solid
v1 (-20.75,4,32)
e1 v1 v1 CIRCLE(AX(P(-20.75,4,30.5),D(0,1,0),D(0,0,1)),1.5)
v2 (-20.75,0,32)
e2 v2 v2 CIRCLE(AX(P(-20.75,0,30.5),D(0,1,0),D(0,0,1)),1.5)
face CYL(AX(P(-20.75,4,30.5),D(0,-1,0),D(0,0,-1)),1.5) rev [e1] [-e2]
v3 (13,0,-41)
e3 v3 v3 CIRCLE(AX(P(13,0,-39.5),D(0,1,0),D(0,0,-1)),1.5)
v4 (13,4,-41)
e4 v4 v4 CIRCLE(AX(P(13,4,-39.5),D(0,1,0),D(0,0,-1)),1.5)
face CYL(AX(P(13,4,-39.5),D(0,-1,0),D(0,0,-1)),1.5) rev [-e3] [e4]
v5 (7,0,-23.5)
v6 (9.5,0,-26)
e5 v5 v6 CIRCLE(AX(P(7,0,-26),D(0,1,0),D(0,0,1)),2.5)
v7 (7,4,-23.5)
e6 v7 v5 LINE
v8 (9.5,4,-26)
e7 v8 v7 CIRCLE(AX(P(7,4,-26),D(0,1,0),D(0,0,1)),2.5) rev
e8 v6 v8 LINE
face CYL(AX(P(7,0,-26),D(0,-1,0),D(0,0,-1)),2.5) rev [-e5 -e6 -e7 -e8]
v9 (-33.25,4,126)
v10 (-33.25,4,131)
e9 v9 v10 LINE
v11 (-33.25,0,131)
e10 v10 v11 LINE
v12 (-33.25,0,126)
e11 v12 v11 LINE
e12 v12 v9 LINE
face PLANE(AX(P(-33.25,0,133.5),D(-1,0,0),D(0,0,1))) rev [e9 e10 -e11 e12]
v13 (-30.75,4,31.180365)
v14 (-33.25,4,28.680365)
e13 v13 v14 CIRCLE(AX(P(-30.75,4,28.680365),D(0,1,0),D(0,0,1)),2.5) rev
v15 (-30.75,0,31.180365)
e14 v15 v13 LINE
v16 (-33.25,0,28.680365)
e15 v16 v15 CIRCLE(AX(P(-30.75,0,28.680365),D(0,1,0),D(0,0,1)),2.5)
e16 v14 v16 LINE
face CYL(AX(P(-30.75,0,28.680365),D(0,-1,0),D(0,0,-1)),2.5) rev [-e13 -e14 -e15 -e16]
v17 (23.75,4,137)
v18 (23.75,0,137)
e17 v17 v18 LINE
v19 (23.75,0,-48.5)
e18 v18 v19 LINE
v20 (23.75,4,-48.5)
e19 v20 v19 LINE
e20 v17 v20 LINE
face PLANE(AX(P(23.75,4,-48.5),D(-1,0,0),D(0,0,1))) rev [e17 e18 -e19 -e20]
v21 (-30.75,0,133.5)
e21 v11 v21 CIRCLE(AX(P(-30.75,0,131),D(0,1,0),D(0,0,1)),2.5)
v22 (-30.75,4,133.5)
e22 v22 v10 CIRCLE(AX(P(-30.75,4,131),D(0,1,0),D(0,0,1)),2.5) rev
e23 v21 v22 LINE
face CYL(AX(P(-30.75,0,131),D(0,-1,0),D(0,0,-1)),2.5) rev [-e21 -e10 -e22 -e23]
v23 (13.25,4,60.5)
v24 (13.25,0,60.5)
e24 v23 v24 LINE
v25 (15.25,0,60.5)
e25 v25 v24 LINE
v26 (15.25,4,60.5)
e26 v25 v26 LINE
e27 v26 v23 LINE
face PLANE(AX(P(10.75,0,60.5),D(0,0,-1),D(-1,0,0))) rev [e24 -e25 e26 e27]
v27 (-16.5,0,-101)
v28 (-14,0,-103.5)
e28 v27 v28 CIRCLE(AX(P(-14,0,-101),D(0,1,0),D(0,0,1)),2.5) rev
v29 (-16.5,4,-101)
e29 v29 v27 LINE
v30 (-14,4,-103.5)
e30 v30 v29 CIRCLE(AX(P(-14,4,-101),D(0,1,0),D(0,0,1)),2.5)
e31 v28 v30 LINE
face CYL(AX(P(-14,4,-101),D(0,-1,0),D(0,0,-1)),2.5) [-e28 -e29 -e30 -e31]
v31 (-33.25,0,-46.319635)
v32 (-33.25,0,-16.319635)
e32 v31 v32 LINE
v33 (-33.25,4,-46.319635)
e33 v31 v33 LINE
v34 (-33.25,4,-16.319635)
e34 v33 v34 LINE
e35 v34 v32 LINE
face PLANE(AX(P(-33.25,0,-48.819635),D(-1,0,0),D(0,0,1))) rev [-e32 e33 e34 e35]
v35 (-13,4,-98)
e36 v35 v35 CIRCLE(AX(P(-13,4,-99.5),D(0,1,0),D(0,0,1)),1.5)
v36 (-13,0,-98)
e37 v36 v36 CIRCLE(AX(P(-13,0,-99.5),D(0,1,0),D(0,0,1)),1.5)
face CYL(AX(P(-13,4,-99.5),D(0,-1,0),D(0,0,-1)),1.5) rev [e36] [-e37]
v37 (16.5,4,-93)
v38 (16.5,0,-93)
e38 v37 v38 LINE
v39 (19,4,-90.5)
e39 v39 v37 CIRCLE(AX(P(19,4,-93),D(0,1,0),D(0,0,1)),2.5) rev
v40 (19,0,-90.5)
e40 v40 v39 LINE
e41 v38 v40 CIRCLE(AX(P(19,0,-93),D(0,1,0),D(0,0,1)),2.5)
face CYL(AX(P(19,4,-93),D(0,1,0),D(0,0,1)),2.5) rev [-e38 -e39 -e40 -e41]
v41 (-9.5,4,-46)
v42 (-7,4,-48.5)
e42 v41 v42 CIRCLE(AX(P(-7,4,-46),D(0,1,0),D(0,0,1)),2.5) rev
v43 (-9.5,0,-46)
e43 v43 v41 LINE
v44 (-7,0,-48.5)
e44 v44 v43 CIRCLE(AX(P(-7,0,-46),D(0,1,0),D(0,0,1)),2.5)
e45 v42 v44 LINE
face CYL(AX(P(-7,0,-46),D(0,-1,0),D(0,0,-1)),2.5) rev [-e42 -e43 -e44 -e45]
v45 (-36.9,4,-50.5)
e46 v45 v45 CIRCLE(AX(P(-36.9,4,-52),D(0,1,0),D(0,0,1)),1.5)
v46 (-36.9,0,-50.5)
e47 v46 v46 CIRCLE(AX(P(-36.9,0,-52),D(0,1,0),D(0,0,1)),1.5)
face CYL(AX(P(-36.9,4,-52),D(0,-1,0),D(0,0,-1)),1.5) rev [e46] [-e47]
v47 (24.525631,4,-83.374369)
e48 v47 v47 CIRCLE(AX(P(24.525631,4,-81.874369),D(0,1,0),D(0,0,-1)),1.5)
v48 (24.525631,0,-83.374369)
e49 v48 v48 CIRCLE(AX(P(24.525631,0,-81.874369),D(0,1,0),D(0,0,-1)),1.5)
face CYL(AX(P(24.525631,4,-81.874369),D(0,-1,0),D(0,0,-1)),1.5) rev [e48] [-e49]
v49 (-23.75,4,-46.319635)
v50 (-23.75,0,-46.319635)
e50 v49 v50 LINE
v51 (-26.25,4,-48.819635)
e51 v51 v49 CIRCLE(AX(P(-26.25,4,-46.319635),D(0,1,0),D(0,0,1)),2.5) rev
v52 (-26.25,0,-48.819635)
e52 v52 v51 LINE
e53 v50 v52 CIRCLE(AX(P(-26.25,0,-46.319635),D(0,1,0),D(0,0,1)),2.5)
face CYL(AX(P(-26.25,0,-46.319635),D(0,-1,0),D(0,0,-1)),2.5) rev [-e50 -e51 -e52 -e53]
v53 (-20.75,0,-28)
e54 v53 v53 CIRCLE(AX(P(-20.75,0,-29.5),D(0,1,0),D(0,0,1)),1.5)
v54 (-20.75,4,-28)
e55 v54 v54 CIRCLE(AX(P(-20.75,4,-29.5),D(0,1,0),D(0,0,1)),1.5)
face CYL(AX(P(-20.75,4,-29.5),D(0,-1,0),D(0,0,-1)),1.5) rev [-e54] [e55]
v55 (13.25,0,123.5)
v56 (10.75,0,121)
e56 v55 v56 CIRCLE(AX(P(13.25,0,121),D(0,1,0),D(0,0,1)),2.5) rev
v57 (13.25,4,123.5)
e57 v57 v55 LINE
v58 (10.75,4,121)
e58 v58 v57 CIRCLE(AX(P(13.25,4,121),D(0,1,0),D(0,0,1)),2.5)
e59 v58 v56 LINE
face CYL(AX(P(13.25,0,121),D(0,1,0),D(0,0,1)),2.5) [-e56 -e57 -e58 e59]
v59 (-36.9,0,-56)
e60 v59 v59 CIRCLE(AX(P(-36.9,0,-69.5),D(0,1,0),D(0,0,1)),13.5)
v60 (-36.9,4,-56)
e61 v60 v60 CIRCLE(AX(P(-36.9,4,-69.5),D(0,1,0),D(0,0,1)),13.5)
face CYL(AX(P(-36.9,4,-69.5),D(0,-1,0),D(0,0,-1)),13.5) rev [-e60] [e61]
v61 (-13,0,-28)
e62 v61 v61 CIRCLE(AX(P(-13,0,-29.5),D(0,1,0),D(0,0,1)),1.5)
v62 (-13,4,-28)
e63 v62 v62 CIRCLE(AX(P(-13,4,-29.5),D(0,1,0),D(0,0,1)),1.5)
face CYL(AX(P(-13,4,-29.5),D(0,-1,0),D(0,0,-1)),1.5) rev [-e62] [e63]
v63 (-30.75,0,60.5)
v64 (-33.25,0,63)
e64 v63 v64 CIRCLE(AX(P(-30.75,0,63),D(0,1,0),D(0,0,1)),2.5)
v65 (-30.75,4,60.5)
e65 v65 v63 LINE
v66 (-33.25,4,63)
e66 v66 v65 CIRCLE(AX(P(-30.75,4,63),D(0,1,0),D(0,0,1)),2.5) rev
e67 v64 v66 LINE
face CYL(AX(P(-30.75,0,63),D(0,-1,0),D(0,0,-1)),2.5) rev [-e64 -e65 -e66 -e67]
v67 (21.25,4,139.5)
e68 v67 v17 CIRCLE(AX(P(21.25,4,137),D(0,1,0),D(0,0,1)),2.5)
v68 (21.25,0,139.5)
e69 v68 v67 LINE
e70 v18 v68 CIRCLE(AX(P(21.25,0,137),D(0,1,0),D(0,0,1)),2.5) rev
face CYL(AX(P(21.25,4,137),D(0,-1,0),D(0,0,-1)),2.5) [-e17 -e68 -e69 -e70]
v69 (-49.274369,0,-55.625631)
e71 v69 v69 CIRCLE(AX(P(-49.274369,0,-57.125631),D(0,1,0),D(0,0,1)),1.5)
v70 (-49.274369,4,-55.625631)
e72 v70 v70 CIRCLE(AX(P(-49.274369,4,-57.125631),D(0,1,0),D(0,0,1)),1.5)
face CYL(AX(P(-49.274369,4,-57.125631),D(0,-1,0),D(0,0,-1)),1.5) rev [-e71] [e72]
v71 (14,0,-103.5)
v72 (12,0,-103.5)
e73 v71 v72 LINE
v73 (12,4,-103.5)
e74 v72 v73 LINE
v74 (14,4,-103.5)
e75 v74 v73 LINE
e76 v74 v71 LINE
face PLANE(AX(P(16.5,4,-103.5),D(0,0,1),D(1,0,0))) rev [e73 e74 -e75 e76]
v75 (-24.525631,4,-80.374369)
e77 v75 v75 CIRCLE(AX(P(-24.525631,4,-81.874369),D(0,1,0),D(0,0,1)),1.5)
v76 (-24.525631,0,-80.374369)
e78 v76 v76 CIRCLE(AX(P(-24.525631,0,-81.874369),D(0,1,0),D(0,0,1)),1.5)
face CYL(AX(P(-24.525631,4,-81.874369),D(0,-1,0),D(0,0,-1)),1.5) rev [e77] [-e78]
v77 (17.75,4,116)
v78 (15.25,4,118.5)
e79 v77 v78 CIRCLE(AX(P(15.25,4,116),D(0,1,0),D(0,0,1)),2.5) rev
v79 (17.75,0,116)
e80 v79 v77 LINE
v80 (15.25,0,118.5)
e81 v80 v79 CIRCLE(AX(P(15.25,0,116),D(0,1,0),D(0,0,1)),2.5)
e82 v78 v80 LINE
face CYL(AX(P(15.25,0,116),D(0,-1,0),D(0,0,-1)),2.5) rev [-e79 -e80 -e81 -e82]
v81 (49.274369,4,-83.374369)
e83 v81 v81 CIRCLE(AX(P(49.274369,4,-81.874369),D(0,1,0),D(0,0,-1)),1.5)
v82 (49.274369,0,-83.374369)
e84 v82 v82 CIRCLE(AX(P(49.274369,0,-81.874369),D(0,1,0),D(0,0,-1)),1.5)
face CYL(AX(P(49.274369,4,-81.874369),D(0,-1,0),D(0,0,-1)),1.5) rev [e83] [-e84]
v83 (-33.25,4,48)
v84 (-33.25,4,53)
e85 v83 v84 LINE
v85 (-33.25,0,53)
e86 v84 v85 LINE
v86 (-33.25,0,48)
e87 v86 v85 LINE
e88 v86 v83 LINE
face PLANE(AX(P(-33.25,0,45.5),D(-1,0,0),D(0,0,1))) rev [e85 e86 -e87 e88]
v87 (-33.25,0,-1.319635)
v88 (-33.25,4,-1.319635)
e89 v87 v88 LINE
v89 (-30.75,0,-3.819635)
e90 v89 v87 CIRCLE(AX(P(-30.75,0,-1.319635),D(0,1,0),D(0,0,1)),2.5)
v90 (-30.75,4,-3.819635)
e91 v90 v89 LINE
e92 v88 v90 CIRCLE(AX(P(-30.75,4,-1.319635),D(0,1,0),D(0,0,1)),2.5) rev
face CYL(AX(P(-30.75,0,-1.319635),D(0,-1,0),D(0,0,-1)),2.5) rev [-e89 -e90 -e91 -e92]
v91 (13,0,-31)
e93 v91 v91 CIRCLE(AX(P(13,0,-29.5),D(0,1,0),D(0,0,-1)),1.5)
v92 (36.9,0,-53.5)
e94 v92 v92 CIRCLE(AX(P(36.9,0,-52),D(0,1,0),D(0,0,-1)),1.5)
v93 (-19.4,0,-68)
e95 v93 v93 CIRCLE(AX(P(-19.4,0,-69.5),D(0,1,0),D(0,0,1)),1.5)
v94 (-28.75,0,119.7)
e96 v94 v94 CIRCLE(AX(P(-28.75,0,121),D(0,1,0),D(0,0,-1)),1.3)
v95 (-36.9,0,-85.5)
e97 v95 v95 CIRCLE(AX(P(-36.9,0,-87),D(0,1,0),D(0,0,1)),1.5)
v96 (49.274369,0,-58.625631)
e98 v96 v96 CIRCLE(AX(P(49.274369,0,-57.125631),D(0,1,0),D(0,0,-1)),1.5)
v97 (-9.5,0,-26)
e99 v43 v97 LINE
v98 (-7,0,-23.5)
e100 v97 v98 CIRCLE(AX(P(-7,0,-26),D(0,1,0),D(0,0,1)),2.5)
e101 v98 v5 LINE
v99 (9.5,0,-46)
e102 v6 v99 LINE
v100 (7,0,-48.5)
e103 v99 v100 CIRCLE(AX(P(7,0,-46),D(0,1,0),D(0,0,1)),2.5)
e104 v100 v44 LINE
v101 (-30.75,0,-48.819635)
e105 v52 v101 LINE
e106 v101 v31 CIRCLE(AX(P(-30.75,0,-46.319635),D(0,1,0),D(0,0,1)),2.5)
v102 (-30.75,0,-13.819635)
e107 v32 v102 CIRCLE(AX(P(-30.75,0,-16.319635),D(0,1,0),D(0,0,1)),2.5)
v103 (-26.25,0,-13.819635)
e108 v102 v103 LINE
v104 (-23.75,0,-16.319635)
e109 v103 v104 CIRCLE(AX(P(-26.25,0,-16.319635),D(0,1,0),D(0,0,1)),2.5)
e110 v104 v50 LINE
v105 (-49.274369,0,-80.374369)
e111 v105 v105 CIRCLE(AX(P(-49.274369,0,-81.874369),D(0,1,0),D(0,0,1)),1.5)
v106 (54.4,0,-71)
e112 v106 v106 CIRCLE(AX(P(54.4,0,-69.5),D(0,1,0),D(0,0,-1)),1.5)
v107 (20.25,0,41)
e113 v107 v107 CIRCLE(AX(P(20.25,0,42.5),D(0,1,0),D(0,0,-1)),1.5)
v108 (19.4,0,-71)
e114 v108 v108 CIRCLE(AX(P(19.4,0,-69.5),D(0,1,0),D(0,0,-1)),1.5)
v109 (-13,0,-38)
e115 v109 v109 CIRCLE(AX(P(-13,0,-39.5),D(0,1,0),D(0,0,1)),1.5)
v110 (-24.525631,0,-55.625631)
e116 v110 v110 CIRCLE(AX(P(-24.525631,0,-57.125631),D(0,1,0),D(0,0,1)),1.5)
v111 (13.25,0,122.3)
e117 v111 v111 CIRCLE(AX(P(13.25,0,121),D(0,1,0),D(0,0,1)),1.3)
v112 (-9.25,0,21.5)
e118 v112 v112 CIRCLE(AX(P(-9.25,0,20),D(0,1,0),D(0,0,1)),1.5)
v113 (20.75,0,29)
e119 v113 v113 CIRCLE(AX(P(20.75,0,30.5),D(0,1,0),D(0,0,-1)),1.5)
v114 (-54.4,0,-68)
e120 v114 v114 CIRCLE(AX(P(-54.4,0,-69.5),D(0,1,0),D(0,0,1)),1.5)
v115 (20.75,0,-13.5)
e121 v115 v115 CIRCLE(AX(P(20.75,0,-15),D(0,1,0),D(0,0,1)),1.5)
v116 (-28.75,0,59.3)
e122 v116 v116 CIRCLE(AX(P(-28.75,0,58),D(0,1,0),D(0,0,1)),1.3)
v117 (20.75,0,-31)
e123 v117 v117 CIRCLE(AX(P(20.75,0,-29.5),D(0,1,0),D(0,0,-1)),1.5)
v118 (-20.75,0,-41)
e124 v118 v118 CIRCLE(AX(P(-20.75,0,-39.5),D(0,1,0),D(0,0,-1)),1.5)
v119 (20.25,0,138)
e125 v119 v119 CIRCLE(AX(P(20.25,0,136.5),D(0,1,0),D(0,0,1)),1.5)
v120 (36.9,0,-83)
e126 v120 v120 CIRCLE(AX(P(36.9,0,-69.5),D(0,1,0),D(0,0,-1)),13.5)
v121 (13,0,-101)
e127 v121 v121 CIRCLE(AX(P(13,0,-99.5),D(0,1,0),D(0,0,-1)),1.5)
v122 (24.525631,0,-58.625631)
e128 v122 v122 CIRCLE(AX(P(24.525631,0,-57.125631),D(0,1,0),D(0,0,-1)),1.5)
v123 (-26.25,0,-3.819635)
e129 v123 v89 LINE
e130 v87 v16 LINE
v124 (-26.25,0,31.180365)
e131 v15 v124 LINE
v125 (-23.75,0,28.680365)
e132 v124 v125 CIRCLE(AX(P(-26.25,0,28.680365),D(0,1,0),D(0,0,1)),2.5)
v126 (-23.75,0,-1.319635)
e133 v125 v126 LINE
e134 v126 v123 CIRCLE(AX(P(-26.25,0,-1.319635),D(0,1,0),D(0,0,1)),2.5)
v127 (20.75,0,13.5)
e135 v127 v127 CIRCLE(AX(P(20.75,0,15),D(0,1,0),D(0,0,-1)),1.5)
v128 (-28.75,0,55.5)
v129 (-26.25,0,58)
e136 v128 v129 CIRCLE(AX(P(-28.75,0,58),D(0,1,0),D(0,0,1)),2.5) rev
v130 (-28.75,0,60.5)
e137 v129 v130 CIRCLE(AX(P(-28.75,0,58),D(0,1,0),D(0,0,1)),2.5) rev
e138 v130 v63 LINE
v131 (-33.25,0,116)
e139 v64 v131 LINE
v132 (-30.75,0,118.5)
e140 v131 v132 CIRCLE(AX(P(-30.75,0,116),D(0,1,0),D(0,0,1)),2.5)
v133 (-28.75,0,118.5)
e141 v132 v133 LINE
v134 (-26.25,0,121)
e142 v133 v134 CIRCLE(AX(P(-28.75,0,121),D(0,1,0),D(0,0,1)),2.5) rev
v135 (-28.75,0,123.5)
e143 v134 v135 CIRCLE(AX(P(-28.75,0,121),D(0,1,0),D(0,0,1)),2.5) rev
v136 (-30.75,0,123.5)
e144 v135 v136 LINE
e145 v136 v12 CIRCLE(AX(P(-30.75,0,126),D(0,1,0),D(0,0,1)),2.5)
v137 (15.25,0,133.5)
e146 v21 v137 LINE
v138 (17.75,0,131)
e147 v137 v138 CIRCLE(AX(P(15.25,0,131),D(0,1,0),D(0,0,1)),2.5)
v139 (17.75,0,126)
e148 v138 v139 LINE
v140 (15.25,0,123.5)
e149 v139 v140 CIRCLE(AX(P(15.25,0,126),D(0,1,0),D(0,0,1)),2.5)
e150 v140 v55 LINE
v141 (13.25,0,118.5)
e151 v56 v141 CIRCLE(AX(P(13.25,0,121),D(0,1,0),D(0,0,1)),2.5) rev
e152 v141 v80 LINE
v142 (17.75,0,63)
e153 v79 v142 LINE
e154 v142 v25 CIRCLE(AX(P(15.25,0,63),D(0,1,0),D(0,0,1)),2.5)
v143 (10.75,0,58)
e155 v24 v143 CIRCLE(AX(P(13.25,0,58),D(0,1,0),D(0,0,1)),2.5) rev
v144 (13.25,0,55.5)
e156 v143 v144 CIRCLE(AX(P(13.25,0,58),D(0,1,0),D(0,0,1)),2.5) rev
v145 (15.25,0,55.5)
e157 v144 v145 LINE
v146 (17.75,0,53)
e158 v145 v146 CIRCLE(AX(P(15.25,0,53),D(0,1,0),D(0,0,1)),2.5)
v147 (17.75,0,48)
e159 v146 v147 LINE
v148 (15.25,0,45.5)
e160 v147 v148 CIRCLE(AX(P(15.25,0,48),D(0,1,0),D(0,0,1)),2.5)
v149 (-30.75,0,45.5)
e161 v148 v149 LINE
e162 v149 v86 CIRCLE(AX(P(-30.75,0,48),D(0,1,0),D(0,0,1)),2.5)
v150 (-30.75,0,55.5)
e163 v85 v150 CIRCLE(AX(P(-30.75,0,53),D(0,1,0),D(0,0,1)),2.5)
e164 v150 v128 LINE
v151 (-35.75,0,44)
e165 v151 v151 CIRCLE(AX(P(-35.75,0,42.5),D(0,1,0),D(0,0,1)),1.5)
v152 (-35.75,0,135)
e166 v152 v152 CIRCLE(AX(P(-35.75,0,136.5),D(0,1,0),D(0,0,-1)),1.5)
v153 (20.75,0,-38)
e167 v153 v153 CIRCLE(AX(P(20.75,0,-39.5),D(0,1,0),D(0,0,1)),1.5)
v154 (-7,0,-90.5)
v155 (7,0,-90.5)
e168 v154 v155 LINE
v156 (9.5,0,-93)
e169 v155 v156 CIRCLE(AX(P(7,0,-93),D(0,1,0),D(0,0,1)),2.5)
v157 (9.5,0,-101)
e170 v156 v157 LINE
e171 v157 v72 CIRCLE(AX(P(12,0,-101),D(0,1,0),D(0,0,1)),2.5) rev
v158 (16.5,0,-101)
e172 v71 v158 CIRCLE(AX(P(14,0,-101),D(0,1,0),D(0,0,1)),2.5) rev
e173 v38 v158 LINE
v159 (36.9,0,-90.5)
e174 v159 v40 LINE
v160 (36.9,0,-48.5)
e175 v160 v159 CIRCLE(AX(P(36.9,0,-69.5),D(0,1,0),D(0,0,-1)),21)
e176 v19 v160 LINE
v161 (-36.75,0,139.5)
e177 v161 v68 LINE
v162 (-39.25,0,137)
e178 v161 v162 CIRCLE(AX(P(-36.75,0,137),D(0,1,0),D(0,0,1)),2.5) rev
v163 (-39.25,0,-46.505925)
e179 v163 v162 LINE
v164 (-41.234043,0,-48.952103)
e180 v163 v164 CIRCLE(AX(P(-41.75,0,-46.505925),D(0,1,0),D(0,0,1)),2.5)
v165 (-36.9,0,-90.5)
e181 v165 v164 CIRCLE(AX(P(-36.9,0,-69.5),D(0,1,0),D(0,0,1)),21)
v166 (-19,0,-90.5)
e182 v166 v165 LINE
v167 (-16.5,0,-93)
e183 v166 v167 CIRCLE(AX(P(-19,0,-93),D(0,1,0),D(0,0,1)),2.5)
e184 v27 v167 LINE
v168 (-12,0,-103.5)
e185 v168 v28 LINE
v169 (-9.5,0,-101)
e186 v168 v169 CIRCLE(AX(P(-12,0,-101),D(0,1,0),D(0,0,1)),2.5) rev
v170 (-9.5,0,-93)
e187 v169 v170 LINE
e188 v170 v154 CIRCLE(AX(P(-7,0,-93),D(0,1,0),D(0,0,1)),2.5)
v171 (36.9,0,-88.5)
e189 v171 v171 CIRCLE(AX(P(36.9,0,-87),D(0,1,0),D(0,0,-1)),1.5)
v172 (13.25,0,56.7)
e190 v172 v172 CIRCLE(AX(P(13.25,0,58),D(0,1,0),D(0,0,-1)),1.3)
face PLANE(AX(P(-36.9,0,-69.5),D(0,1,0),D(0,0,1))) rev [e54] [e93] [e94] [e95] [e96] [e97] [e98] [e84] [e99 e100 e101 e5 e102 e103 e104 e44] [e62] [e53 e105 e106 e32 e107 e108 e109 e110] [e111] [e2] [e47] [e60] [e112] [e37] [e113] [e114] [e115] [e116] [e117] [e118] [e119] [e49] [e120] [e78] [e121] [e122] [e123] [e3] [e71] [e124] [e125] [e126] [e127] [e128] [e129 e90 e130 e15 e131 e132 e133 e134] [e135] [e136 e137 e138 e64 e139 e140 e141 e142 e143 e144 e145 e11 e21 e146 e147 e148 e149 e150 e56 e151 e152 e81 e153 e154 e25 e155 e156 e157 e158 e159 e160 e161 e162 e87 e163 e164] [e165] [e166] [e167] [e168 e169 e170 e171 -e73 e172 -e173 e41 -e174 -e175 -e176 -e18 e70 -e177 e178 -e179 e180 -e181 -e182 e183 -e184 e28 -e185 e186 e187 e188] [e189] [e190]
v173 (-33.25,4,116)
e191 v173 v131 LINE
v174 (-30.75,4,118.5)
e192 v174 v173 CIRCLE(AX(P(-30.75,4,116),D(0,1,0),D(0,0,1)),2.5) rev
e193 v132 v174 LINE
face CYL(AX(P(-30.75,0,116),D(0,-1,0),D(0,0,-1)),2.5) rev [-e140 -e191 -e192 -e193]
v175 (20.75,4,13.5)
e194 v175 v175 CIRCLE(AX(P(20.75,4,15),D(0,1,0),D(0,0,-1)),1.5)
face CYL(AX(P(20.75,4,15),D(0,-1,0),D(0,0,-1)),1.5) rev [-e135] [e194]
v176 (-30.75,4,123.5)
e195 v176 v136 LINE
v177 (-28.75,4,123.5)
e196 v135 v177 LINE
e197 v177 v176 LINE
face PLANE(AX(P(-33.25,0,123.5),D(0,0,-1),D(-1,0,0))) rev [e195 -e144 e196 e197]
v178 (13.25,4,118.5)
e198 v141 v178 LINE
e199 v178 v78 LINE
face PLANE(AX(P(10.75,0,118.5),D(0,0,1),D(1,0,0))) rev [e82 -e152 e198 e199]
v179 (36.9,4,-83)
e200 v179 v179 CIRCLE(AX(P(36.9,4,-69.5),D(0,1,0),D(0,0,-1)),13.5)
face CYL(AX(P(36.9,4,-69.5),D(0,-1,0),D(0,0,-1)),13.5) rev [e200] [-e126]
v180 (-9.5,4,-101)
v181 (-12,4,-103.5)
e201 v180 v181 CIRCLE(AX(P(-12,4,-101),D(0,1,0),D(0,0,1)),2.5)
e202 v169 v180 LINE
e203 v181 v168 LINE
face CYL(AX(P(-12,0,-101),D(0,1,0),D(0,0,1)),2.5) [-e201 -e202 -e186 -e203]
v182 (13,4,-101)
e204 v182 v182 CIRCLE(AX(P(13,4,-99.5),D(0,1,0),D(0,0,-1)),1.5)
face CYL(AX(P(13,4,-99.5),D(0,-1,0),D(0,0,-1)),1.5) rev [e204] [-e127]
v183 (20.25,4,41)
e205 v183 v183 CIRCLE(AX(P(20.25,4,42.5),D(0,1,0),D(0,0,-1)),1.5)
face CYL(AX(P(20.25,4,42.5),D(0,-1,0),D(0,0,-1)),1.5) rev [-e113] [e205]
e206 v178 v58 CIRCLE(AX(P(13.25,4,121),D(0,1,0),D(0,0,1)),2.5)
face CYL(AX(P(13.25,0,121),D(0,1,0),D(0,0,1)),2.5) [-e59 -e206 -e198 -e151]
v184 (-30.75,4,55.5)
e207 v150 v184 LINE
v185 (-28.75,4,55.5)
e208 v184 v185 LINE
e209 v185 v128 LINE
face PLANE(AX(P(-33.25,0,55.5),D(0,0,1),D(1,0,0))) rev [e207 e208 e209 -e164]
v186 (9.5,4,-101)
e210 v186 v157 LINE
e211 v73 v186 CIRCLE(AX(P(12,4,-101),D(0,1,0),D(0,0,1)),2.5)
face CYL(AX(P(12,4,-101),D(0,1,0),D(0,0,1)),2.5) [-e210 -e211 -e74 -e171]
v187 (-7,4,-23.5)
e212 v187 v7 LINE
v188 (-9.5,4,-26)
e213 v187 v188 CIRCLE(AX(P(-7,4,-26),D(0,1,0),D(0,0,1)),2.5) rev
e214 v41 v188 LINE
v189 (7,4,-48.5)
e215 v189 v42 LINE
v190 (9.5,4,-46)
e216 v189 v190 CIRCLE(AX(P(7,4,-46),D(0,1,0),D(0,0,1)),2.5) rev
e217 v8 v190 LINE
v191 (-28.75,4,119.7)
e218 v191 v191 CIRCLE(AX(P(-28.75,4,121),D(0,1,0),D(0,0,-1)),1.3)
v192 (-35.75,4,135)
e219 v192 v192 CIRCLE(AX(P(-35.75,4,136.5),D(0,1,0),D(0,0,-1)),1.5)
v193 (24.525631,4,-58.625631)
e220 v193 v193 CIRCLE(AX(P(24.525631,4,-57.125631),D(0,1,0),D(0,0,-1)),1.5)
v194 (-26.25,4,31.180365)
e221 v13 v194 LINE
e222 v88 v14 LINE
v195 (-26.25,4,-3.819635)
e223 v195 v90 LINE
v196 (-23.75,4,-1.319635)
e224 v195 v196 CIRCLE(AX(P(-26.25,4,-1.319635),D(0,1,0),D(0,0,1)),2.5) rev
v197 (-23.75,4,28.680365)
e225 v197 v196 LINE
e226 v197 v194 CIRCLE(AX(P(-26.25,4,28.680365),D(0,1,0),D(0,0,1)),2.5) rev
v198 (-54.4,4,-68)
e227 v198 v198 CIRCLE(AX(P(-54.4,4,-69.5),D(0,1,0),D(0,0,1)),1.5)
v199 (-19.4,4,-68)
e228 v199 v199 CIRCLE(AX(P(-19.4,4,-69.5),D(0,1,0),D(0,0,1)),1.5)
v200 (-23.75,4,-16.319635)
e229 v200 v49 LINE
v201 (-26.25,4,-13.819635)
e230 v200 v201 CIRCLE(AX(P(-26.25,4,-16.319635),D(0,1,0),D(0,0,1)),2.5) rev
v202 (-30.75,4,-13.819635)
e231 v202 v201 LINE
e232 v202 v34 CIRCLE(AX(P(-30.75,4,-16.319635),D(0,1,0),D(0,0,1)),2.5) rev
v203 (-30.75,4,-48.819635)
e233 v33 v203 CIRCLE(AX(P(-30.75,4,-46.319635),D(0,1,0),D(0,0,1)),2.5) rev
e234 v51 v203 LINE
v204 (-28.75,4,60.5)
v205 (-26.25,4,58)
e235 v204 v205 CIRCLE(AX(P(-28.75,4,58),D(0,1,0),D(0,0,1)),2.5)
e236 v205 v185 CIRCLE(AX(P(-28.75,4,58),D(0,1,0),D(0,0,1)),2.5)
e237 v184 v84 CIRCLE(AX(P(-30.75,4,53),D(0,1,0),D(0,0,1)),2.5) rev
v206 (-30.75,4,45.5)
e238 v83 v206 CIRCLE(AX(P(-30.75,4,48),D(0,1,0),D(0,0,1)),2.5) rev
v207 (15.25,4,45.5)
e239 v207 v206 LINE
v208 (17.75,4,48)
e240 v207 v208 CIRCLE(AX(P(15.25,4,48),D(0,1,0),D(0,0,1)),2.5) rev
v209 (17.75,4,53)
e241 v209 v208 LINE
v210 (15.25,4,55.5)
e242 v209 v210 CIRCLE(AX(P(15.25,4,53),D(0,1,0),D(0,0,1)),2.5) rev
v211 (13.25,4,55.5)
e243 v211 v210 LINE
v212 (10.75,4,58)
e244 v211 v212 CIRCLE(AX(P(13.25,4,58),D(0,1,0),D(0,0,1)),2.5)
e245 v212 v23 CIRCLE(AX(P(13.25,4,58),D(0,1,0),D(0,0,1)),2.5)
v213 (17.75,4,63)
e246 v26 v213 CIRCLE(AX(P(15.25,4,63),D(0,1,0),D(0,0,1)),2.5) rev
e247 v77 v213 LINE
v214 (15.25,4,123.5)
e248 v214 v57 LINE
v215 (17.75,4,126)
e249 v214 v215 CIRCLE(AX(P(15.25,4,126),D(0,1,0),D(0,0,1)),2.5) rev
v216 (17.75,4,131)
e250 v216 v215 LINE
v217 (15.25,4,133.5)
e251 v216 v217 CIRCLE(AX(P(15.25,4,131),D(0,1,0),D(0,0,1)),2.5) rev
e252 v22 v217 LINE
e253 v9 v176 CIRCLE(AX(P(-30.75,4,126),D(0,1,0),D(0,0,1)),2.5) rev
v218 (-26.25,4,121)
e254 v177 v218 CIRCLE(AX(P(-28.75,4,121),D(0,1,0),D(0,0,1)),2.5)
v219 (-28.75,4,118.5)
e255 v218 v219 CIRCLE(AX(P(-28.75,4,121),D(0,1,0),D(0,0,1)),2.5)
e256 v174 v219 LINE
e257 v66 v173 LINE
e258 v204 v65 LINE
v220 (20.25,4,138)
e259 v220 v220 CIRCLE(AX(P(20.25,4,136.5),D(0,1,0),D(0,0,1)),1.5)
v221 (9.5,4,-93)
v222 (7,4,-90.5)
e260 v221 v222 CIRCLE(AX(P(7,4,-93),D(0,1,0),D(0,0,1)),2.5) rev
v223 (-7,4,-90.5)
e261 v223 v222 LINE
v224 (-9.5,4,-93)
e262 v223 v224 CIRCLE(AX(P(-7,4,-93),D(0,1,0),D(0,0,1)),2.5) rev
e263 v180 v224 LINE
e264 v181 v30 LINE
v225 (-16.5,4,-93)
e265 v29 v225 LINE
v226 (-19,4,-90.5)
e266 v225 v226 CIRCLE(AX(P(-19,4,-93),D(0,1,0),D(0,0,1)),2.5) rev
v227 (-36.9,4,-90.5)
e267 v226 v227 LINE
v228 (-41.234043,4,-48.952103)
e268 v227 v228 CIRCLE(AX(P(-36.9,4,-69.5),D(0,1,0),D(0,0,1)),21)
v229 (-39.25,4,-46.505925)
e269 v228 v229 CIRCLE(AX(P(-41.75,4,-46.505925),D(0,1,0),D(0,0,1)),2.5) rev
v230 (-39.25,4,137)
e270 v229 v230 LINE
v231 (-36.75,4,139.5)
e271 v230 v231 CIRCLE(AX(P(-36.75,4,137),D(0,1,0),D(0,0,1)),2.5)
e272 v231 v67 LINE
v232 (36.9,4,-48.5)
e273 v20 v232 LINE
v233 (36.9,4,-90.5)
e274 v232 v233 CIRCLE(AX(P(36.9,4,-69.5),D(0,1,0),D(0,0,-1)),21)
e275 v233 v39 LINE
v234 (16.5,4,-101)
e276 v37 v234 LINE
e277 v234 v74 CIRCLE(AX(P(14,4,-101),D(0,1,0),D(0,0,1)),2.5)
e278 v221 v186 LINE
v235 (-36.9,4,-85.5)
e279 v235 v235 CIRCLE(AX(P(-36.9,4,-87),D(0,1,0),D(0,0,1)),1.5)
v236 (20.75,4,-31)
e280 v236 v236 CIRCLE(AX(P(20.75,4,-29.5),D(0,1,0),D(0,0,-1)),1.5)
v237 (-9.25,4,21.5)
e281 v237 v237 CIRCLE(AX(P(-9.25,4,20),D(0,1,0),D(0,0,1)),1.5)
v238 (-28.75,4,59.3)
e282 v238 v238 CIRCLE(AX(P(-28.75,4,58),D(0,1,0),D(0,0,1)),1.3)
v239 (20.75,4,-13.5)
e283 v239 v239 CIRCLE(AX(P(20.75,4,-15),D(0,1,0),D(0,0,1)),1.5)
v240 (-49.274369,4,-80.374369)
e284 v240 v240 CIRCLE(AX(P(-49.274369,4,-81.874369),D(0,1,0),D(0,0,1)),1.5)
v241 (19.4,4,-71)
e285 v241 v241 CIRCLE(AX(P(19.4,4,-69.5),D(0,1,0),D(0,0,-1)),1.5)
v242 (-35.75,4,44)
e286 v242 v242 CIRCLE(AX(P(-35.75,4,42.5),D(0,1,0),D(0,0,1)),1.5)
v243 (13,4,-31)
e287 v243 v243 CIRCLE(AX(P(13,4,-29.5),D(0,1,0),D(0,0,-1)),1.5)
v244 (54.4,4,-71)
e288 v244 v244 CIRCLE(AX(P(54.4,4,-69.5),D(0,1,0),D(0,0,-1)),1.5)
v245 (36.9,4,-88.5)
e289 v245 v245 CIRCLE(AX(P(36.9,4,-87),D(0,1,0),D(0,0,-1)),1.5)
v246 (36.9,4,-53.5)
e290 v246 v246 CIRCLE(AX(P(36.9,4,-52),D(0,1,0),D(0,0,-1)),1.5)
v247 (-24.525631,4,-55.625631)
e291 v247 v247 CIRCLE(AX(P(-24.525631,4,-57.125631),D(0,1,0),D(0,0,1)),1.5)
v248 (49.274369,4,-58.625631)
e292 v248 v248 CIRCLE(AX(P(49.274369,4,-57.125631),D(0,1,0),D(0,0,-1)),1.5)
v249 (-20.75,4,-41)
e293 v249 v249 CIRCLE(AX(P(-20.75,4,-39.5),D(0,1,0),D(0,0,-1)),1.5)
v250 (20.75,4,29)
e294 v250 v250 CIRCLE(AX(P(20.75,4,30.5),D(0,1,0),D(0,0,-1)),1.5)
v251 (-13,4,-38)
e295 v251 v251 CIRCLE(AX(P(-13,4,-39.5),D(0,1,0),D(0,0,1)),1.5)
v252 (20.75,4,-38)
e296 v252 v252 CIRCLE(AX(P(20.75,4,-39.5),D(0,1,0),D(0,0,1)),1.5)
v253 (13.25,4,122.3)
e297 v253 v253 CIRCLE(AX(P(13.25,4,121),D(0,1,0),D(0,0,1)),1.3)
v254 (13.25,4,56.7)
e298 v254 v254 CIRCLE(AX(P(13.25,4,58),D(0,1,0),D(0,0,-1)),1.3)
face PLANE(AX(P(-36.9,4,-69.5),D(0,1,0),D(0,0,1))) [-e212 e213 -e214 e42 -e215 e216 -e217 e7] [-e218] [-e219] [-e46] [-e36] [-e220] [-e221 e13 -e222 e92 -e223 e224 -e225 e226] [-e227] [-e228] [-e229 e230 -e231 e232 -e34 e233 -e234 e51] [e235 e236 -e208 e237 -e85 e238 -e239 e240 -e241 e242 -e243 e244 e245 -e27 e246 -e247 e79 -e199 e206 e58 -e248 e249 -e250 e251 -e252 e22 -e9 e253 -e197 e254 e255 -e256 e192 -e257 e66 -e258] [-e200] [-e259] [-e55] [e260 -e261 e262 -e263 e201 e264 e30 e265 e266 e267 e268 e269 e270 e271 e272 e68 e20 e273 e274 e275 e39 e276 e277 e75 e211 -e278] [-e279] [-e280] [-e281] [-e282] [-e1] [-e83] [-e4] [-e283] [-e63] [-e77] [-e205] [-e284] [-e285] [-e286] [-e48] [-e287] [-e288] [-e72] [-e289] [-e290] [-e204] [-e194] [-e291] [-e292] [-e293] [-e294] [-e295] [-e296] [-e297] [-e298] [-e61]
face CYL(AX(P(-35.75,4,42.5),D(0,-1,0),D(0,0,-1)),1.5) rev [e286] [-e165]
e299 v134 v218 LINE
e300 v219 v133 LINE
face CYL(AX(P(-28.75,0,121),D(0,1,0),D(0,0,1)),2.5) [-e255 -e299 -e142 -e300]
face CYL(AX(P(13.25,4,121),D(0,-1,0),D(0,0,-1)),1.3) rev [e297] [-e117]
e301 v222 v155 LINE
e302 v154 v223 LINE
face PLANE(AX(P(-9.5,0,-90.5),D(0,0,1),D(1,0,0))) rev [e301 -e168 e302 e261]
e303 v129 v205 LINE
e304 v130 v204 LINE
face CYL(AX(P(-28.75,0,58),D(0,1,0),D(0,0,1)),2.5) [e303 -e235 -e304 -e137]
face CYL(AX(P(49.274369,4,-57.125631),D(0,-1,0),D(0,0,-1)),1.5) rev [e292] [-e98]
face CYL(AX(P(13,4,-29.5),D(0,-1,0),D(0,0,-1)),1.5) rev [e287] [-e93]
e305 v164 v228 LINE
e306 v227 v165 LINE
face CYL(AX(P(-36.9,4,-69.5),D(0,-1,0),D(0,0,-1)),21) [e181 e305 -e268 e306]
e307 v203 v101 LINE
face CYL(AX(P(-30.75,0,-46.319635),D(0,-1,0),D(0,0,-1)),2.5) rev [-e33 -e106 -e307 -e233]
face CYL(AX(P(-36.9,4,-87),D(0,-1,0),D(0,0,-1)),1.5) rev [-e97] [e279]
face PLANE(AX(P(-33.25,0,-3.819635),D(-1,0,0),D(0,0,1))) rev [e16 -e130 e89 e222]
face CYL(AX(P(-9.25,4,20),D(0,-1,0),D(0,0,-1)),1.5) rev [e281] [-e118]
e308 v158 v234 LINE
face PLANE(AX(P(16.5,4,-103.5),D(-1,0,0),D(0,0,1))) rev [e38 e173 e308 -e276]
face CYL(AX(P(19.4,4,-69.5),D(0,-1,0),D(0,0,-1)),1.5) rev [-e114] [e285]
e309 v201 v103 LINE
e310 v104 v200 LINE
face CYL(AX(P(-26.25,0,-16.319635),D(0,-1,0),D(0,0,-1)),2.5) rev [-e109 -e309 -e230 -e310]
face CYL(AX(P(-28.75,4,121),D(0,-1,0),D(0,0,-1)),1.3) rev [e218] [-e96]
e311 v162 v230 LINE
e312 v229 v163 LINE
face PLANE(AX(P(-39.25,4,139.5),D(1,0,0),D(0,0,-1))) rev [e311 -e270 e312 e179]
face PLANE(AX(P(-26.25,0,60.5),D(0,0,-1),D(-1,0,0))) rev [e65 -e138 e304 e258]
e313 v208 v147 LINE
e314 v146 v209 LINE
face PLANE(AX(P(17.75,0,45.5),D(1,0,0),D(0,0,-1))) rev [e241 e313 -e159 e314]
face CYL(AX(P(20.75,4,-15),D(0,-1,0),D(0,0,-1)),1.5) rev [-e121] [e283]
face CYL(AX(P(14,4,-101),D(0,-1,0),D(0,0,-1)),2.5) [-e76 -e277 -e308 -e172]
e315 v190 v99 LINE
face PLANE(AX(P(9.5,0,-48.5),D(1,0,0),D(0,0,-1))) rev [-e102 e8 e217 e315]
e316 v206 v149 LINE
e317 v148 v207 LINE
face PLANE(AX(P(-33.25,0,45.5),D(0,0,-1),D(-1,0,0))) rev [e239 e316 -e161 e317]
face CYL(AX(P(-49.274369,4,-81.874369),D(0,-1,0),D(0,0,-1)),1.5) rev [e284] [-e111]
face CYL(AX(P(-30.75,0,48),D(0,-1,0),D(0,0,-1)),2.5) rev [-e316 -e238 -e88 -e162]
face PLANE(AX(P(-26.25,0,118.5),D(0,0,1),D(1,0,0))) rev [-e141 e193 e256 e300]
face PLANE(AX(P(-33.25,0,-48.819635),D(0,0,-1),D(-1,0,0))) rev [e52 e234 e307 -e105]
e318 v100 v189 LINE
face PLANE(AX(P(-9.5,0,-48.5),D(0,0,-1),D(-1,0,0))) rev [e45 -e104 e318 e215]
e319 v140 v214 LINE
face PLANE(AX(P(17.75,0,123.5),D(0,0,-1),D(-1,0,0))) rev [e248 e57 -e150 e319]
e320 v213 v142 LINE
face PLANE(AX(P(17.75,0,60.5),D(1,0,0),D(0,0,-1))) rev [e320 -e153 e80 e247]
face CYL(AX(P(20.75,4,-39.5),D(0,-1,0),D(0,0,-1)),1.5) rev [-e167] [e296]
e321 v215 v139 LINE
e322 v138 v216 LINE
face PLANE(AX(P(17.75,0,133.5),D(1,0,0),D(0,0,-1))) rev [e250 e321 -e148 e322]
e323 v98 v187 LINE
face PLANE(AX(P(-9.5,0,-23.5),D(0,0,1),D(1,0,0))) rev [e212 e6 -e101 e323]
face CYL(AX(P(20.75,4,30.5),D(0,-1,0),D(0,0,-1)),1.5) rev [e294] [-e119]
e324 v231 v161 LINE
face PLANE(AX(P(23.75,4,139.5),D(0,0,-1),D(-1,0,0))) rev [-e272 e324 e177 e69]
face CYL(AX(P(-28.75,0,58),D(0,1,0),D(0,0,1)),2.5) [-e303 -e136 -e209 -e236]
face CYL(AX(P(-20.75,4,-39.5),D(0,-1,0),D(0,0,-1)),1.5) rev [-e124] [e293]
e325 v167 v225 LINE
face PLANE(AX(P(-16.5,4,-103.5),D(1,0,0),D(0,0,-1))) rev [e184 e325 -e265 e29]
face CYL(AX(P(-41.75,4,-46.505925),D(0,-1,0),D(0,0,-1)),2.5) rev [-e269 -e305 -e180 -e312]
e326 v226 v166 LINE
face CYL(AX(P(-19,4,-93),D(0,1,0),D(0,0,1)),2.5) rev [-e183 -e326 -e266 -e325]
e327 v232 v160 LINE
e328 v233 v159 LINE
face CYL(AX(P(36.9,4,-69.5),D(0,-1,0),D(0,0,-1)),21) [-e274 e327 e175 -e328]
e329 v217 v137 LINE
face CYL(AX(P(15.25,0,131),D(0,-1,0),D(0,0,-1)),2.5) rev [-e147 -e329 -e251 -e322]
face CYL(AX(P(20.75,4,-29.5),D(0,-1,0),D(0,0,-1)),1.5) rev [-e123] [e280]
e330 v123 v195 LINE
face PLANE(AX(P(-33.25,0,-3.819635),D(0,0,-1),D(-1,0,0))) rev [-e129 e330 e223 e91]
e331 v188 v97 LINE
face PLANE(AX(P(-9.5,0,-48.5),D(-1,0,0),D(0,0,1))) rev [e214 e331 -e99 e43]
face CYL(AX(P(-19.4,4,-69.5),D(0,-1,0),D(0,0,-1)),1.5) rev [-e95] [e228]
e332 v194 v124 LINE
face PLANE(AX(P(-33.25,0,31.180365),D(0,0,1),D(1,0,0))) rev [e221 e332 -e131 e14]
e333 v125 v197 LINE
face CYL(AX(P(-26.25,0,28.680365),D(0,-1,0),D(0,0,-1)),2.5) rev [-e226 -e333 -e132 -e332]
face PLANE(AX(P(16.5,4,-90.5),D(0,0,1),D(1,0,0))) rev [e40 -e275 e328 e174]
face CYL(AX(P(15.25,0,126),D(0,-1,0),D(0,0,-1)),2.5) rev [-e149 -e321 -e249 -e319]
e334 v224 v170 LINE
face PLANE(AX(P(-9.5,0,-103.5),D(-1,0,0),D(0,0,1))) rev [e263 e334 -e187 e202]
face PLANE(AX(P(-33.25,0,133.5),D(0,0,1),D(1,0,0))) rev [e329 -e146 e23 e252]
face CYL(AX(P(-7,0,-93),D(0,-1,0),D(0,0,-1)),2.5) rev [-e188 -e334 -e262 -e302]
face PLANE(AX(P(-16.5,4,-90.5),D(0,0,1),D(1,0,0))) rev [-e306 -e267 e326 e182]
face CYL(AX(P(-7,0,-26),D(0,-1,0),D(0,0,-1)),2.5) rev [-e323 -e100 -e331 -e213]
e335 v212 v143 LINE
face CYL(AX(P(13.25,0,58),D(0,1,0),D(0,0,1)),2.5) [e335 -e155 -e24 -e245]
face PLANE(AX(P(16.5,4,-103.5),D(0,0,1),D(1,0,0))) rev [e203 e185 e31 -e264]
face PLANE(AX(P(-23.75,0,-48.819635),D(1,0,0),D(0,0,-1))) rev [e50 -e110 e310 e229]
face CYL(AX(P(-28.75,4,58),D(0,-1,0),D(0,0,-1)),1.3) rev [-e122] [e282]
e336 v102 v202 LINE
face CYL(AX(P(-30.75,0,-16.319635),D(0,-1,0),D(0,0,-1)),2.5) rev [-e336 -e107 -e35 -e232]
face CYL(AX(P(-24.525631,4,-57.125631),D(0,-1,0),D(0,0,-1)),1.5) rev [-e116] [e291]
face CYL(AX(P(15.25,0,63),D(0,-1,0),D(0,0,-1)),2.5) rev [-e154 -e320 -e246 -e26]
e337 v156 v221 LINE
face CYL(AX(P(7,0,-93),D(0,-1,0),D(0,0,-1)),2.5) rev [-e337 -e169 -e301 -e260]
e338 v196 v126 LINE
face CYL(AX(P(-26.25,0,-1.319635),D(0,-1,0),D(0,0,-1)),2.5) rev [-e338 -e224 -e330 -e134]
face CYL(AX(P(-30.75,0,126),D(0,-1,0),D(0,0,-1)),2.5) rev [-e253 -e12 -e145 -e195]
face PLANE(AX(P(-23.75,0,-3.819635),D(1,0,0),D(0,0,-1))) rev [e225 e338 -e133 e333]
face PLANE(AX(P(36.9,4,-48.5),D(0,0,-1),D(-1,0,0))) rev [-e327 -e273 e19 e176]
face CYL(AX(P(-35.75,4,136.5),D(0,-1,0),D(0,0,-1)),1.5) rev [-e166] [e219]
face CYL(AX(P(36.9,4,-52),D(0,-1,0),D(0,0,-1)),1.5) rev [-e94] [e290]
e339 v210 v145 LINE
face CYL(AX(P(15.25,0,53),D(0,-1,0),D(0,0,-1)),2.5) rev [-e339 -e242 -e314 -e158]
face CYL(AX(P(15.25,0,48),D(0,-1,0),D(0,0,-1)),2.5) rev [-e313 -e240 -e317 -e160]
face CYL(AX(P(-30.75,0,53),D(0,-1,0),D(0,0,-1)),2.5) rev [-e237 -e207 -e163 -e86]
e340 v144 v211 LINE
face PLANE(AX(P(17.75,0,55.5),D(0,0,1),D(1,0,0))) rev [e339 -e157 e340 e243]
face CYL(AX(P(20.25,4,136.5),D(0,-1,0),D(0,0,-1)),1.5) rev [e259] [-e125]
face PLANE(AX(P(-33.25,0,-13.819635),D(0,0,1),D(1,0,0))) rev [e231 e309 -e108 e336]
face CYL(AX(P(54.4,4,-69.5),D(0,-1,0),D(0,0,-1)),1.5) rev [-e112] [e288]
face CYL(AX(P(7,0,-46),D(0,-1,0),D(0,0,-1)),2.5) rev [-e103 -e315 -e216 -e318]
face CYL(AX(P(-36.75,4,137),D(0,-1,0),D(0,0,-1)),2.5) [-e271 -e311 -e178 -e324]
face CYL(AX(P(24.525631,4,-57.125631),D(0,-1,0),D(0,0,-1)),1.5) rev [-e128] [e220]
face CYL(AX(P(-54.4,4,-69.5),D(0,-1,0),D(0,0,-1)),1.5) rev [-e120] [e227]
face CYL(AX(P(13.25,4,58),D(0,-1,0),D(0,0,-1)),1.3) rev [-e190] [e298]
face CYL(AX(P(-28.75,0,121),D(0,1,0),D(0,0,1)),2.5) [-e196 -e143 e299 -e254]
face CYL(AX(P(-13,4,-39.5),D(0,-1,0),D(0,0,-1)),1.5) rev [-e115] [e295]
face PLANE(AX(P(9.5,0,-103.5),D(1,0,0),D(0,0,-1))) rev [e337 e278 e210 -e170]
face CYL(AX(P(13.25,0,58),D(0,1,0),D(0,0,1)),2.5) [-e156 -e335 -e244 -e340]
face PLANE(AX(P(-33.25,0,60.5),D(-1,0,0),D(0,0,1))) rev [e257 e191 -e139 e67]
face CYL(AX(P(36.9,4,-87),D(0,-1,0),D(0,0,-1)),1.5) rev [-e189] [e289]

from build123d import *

# Parameters (mm, degrees)
SKETCH_1_R          = 13.5
SKETCH_1_R_2        = 1.5
SKETCH_1_R_3        = 1.3
EXTRUDE_1_DEPTH     = 4
SKETCH_2_W          = 19
SKETCH_2_H          = 13
SKETCH_2_W_2        = 9.5
SKETCH_2_H_2        = 35
SKETCH_2_H_3        = 25
CUT_EXTRUDE_1_DEPTH = 152.091561644
FILLET_1_R          = 2.5


with BuildPart() as part:
    # 草图1 → 凸台-拉伸1 (new body)
    with BuildSketch(Plane(origin=(0, 0, 0), x_dir=(1, 0, 0), z_dir=(0, 1, 0))):
        with BuildLine():
            Line((16.5, 103.5), (-16.5, 103.5))
            Line((-16.5, 103.5), (-16.5, 90.5))
            Line((-16.5, 90.5), (-36.9, 90.5))
            ThreePointArc((-36.9, 90.5), (-57.866998484, 70.67684942), (-39.25, 48.631902339))
            Line((-39.25, 48.631902339), (-39.25, -39.5))
            Line((-39.25, -39.5), (-39.25, -139.5))
            Line((-39.25, -139.5), (23.75, -139.5))
            Line((23.75, -139.5), (23.75, -39.5))
            Line((23.75, -39.5), (23.75, -34.5))
            Line((23.75, -34.5), (23.75, 34.5))
            Line((23.75, 34.5), (23.75, 48.5))
            Line((23.75, 48.5), (36.9, 48.5))
            ThreePointArc((36.9, 48.5), (57.9, 69.5), (36.9, 90.5))
            Line((36.9, 90.5), (16.5, 90.5))
            Line((16.5, 90.5), (16.5, 103.5))
        make_face()
        with Locations(Location((-36.9, 69.5, 0), (0, 0, 270))):
            Circle(SKETCH_1_R, mode=Mode.SUBTRACT)
        with Locations(Location((-36.9, 87, 0), (0, 0, 270))):
            Circle(SKETCH_1_R_2, mode=Mode.SUBTRACT)
        with Locations(Location((-24.525631329, 81.874368671, 0), (0, 0, 270))):
            Circle(SKETCH_1_R_2, mode=Mode.SUBTRACT)
        with Locations(Location((-19.4, 69.5, 0), (0, 0, 270))):
            Circle(SKETCH_1_R_2, mode=Mode.SUBTRACT)
        with Locations(Location((-24.525631329, 57.125631329, 0), (0, 0, 270))):
            Circle(SKETCH_1_R_2, mode=Mode.SUBTRACT)
        with Locations(Location((-36.9, 52, 0), (0, 0, 270))):
            Circle(SKETCH_1_R_2, mode=Mode.SUBTRACT)
        with Locations(Location((-49.274368671, 57.125631329, 0), (0, 0, 270))):
            Circle(SKETCH_1_R_2, mode=Mode.SUBTRACT)
        with Locations(Location((-54.4, 69.5, 0), (0, 0, 270))):
            Circle(SKETCH_1_R_2, mode=Mode.SUBTRACT)
        with Locations(Location((-49.274368671, 81.874368671, 0), (0, 0, 270))):
            Circle(SKETCH_1_R_2, mode=Mode.SUBTRACT)
        with Locations(Location((-13, 99.5, 0), (0, 0, 270))):
            Circle(SKETCH_1_R_2, mode=Mode.SUBTRACT)
        with Locations(Location((-13, 39.5, 0), (0, 0, 270))):
            Circle(SKETCH_1_R_2, mode=Mode.SUBTRACT)
        with Locations(Location((13, 39.5, 0), (0, 0, 90))):
            Circle(SKETCH_1_R_2, mode=Mode.SUBTRACT)
        with Locations(Location((13, 99.5, 0), (0, 0, 90))):
            Circle(SKETCH_1_R_2, mode=Mode.SUBTRACT)
        with Locations(Location((54.4, 69.5, 0), (0, 0, 90))):
            Circle(SKETCH_1_R_2, mode=Mode.SUBTRACT)
        with Locations(Location((49.274368671, 57.125631329, 0), (0, 0, 90))):
            Circle(SKETCH_1_R_2, mode=Mode.SUBTRACT)
        with Locations(Location((36.9, 52, 0), (0, 0, 90))):
            Circle(SKETCH_1_R_2, mode=Mode.SUBTRACT)
        with Locations(Location((24.525631329, 57.125631329, 0), (0, 0, 90))):
            Circle(SKETCH_1_R_2, mode=Mode.SUBTRACT)
        with Locations(Location((19.4, 69.5, 0), (0, 0, 90))):
            Circle(SKETCH_1_R_2, mode=Mode.SUBTRACT)
        with Locations(Location((24.525631329, 81.874368671, 0), (0, 0, 90))):
            Circle(SKETCH_1_R_2, mode=Mode.SUBTRACT)
        with Locations(Location((36.9, 87, 0), (0, 0, 90))):
            Circle(SKETCH_1_R_2, mode=Mode.SUBTRACT)
        with Locations(Location((49.274368671, 81.874368671, 0), (0, 0, 90))):
            Circle(SKETCH_1_R_2, mode=Mode.SUBTRACT)
        with Locations(Location((36.9, 69.5, 0), (0, 0, 90))):
            Circle(SKETCH_1_R, mode=Mode.SUBTRACT)
        with Locations(Location((-13, 29.5, 0), (0, 0, 270))):
            Circle(SKETCH_1_R_2, mode=Mode.SUBTRACT)
        with Locations(Location((-35.75, -42.5, 0), (0, 0, 270))):
            Circle(SKETCH_1_R_2, mode=Mode.SUBTRACT)
        with Locations(Location((-35.75, -136.5, 0), (0, 0, 90))):
            Circle(SKETCH_1_R_2, mode=Mode.SUBTRACT)
        with Locations(Location((20.25, -136.5, 0), (0, 0, 270))):
            Circle(SKETCH_1_R_2, mode=Mode.SUBTRACT)
        with Locations(Location((20.25, -42.5, 0), (0, 0, 90))):
            Circle(SKETCH_1_R_2, mode=Mode.SUBTRACT)
        with Locations(Location((13, 29.5, 0), (0, 0, 90))):
            Circle(SKETCH_1_R_2, mode=Mode.SUBTRACT)
        with Locations(Location((20.75, 15, 0), (0, 0, 270))):
            Circle(SKETCH_1_R_2, mode=Mode.SUBTRACT)
        with Locations(Location((20.75, -15, 0), (0, 0, 90))):
            Circle(SKETCH_1_R_2, mode=Mode.SUBTRACT)
        with Locations(Location((-28.75, -58, 0), (0, 0, 270))):
            Circle(SKETCH_1_R_3, mode=Mode.SUBTRACT)
        with Locations(Location((-28.75, -121, 0), (0, 0, 90))):
            Circle(SKETCH_1_R_3, mode=Mode.SUBTRACT)
        with Locations(Location((13.25, -121, 0), (0, 0, 270))):
            Circle(SKETCH_1_R_3, mode=Mode.SUBTRACT)
        with Locations(Location((13.25, -58, 0), (0, 0, 90))):
            Circle(SKETCH_1_R_3, mode=Mode.SUBTRACT)
        with Locations(Location((-9.25, -20, 0), (0, 0, 270))):
            Circle(SKETCH_1_R_2, mode=Mode.SUBTRACT)
        with Locations(Location((20.75, 39.5, 0), (0, 0, 270))):
            Circle(SKETCH_1_R_2, mode=Mode.SUBTRACT)
        with Locations(Location((-20.75, 39.5, 0), (0, 0, 90))):
            Circle(SKETCH_1_R_2, mode=Mode.SUBTRACT)
        with Locations(Location((20.75, 29.5, 0), (0, 0, 90))):
            Circle(SKETCH_1_R_2, mode=Mode.SUBTRACT)
        with Locations(Location((-20.75, 29.5, 0), (0, 0, 270))):
            Circle(SKETCH_1_R_2, mode=Mode.SUBTRACT)
        with Locations(Location((20.75, -30.5, 0), (0, 0, 90))):
            Circle(SKETCH_1_R_2, mode=Mode.SUBTRACT)
        with Locations(Location((-20.75, -30.5, 0), (0, 0, 270))):
            Circle(SKETCH_1_R_2, mode=Mode.SUBTRACT)
    extrude(amount=EXTRUDE_1_DEPTH)

    # 草图2 → 切除-拉伸1 (cut, through all)
    with BuildSketch(Plane(origin=(0, 4, 0), x_dir=(1, 0, 0), z_dir=(0, 1, 0))):
        with Locations((0, 97)):
            Rectangle(SKETCH_2_W, SKETCH_2_H)
        Polygon((-33.25, -45.5), (17.75, -45.5), (17.75, -55.5), (10.75, -55.5), (10.75, -60.5), (17.75, -60.5), (17.75, -118.5), (10.75, -118.5), (10.75, -123.5), (17.75, -123.5), (17.75, -133.5), (-33.25, -133.5), (-33.25, -123.5), (-26.25, -123.5), (-26.25, -118.5), (-33.25, -118.5), (-33.25, -60.5), (-26.25, -60.5), (-26.25, -55.5), (-33.25, -55.5), align=None)
        with Locations((-28.5, 31.319634916)):
            Rectangle(SKETCH_2_W_2, SKETCH_2_H_2)
        with Locations((-28.5, -13.680365084)):
            Rectangle(SKETCH_2_W_2, SKETCH_2_H_2)
        with Locations((0, 36)):
            Rectangle(SKETCH_2_W, SKETCH_2_H_3)
    extrude(amount=-CUT_EXTRUDE_1_DEPTH, mode=Mode.SUBTRACT)

    # 圆角1
    fillet_1_edges = [part.edges().sort_by_distance(p)[0] for p in [
        (23.75, 2, 139.5),
        (-39.25, 2, 139.5),
        (-33.25, 2, 123.5),
        (-26.25, 2, 123.5),
        (-33.25, 2, 118.5),
        (-26.25, 2, 118.5),
        (-33.25, 2, 133.5),
        (17.75, 2, 133.5),
        (17.75, 2, 123.5),
        (10.75, 2, 123.5),
        (10.75, 2, 118.5),
        (17.75, 2, 118.5),
        (17.75, 2, 55.5),
        (17.75, 2, 60.5),
        (10.75, 2, 60.5),
        (10.75, 2, 55.5),
        (-33.25, 2, 60.5),
        (-26.25, 2, 60.5),
        (-26.25, 2, 55.5),
        (-33.25, 2, 55.5),
        (17.75, 2, 45.5),
        (-33.25, 2, 45.5),
        (-33.25, 2, 31.180365084),
        (-23.75, 2, 31.180365084),
        (-23.75, 2, -13.819634916),
        (-33.25, 2, -13.819634916),
        (-23.75, 2, -3.819634916),
        (-33.25, 2, -3.819634916),
        (-33.25, 2, -48.819634916),
        (-23.75, 2, -48.819634916),
        (-39.25, 2, -48.631902339),
        (-16.5, 2, -90.5),
        (9.5, 2, -90.5),
        (16.5, 2, -90.5),
        (16.5, 2, -103.5),
        (9.5, 2, -103.5),
        (-9.5, 2, -90.5),
        (-9.5, 2, -103.5),
        (-16.5, 2, -103.5),
        (-9.5, 2, -23.5),
        (9.5, 2, -23.5),
        (9.5, 2, -48.5),
        (-9.5, 2, -48.5),
    ]]
    fillet(fillet_1_edges, radius=FILLET_1_R - 0.0001)  # a hair under: the kernel refuses the full size


solid = part.part
